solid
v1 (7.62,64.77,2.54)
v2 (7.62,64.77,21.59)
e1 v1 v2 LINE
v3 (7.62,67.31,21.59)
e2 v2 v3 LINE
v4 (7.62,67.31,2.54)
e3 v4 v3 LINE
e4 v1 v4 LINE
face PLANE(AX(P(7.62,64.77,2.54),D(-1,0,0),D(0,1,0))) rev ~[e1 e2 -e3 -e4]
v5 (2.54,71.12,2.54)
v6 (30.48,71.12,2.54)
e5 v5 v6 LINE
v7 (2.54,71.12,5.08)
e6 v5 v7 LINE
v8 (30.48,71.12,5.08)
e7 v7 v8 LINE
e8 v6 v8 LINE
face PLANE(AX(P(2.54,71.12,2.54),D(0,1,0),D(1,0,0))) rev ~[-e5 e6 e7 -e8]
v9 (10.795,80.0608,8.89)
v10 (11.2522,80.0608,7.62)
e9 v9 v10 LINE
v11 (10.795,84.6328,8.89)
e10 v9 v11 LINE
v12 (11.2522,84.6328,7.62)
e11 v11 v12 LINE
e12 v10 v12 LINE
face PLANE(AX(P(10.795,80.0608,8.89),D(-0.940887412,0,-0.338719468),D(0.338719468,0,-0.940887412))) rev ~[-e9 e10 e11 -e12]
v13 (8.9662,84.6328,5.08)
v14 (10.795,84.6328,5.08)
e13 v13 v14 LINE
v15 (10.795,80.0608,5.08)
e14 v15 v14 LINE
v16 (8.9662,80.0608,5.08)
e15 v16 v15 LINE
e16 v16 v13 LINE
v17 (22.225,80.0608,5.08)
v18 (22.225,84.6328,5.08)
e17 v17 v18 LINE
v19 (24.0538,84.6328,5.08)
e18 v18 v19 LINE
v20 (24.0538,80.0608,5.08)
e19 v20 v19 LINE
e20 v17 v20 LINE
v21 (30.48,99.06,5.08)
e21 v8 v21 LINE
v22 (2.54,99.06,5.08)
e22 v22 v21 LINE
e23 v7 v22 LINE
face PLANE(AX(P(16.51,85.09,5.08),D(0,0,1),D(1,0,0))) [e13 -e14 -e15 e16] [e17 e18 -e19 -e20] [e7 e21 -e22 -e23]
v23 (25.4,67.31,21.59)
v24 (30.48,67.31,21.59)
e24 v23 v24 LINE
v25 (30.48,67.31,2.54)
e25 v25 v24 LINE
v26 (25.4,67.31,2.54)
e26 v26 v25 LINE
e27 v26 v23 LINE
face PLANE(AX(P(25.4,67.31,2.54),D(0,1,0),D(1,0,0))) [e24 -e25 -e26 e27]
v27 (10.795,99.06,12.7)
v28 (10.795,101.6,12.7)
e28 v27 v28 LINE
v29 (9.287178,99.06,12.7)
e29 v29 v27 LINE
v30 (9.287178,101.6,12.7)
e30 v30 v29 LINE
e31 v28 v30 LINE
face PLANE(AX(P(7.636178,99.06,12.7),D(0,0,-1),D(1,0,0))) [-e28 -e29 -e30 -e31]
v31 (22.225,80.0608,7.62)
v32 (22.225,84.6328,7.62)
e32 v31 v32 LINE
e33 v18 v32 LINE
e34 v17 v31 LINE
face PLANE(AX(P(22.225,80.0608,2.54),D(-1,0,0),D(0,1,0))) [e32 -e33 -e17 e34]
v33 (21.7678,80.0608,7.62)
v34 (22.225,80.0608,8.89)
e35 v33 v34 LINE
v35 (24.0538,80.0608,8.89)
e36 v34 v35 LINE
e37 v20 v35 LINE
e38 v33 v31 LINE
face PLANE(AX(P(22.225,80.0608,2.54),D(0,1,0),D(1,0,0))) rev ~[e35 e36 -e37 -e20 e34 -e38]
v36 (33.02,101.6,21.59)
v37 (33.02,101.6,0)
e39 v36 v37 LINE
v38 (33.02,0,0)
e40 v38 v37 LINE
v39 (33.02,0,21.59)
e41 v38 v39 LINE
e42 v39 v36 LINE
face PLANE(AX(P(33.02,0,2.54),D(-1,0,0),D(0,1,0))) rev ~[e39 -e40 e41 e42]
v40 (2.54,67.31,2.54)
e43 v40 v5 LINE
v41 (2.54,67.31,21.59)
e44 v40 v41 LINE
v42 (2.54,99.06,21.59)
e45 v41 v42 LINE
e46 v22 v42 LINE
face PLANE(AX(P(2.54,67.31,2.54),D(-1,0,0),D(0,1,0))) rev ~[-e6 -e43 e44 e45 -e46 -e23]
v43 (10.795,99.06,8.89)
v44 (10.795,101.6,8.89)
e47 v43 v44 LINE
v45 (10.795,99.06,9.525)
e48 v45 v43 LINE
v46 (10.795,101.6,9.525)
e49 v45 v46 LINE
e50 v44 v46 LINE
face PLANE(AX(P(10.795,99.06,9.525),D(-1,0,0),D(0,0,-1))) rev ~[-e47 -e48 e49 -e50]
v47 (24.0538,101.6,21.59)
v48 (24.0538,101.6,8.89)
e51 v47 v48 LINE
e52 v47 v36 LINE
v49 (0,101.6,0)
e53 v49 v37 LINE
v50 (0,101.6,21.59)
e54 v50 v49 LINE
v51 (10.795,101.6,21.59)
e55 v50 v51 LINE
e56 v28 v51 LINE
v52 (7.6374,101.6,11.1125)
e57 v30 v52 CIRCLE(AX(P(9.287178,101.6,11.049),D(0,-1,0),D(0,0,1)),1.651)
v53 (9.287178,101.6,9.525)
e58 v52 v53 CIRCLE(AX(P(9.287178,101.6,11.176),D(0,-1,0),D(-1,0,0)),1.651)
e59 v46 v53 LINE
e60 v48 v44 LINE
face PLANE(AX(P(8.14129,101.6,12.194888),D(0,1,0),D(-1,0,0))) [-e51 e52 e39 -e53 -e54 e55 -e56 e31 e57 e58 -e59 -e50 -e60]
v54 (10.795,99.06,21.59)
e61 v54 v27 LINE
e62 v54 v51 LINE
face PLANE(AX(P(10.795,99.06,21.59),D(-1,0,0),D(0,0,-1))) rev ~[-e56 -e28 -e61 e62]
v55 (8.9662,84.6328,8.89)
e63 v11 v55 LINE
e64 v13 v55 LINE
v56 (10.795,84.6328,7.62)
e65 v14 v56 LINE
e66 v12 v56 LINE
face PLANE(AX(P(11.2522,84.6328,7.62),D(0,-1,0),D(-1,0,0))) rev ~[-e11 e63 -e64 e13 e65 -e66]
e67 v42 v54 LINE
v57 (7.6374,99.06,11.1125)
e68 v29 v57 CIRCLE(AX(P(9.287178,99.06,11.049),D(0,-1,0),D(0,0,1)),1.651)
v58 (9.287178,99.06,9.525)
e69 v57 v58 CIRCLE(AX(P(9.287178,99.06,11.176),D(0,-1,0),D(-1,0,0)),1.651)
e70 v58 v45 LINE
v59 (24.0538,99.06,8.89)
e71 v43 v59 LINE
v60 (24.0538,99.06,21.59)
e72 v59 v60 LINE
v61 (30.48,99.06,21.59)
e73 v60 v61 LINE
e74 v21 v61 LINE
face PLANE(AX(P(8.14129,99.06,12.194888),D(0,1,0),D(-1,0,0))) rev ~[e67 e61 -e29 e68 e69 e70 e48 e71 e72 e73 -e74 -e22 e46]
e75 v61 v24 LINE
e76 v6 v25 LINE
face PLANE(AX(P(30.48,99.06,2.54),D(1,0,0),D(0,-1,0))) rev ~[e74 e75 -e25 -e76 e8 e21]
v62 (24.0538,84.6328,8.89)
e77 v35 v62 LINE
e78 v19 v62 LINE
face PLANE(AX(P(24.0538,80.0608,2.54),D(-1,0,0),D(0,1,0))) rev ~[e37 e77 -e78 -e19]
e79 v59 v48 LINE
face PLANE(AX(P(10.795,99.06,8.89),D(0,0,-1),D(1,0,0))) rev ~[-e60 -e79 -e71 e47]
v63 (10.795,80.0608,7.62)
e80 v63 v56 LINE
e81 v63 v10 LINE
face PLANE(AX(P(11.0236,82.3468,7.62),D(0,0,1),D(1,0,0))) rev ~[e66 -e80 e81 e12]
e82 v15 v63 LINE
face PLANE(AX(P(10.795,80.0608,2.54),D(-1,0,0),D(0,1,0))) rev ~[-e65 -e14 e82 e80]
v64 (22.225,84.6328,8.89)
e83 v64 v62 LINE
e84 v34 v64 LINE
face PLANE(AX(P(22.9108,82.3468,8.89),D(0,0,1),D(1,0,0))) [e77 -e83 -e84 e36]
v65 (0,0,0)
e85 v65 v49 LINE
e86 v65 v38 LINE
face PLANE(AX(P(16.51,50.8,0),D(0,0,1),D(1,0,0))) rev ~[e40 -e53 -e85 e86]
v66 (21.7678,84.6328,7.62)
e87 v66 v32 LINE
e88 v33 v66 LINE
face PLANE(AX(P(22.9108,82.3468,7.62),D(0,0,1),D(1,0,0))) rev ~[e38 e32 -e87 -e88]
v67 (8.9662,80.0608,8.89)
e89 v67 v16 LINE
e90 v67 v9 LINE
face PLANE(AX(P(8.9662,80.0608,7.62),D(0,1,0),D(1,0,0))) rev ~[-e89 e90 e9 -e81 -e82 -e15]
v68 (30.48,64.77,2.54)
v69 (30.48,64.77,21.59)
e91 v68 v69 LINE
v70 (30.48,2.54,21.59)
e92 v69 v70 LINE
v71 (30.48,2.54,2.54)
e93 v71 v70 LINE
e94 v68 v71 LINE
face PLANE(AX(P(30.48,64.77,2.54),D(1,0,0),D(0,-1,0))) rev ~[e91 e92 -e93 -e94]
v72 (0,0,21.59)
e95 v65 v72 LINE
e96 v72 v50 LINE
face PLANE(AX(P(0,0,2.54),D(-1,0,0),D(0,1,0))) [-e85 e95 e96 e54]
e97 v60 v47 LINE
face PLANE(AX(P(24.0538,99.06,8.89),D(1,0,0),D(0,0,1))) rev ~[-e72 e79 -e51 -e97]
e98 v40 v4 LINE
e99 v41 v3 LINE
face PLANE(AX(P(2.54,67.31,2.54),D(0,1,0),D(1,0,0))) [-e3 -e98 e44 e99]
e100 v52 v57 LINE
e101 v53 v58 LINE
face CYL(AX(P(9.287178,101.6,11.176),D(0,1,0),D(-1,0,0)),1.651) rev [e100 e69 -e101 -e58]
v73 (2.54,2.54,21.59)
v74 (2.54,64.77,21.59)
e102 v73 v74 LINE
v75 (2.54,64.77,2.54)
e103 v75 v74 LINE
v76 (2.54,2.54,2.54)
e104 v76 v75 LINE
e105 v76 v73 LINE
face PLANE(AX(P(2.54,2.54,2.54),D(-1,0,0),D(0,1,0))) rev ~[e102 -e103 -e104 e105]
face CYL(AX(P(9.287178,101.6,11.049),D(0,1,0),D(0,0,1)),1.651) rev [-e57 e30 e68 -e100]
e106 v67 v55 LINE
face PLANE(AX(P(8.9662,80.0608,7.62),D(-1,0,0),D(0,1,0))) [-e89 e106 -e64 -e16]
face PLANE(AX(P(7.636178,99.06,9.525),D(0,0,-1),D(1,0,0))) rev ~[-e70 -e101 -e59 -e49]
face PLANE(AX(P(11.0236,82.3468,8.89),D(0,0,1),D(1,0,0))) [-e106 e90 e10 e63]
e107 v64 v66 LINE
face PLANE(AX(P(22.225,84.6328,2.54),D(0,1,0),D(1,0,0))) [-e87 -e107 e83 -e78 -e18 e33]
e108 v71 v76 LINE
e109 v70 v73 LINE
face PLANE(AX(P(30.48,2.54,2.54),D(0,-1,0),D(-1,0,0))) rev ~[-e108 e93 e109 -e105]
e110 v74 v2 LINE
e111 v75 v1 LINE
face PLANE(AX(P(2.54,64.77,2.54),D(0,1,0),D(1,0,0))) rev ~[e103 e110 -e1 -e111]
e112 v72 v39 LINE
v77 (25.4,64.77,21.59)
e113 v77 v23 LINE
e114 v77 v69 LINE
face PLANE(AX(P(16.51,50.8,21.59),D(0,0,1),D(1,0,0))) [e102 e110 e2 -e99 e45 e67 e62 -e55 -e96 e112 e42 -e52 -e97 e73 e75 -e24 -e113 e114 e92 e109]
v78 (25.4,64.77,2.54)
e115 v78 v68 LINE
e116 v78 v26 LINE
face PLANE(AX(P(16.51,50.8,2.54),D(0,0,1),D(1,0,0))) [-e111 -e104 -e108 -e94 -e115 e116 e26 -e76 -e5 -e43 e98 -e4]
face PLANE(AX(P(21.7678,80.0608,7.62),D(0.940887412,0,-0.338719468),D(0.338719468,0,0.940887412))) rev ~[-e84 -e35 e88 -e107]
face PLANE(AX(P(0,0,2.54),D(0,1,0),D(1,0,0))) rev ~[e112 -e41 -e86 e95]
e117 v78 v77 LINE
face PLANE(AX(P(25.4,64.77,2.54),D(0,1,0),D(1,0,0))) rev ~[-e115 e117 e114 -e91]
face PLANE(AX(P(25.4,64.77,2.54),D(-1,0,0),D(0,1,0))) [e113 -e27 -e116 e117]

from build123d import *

# Parameters (mm, degrees)
F0_W        = 33.02
F0_H        = 101.6
F1_DEPTH    = 2.54
F2_W        = 33.02
F2_H        = 101.6
F2_W_2      = 5.08
F2_H_2      = 2.54
F3_DEPTH    = 19.05
F2_W_3      = 27.94
F2_H_3      = 27.94
F2_W_4      = 1.8288
F2_H_4      = 4.572
F4_DEPTH    = 2.54
F5_DEPTH    = 5.08
F7_W        = 3.1588217151
F7_H        = 3.175
F8_DEPTH    = 25.4
F9_T1_DEPTH = 2.54
F10_W       = 0.4572
F10_H       = 4.572
F10_W_2     = 1.8288
F10_W_3     = 2.286
F11_DEPTH   = 1.27
F13_DEPTH   = 6.35


# Not quite as in the source:
# - a fillet or chamfer that OpenCascade refuses, or shapes differently, is made with other operations: its cross-section is extruded or revolved along the edge and cut away or added


with BuildPart() as f1:
    # F0 (on Top) → F1 (new body)
    with BuildSketch(Plane.XY):
        with Locations((16.51, 50.8)):
            Rectangle(F0_W, F0_H)
    extrude(amount=F1_DEPTH)

    # F2 (on face) → F3 (join)
    with BuildSketch(Plane.XY.offset(2.54)):
        with Locations((16.51, 50.8)):
            Rectangle(F2_W, F2_H)
        Polygon((30.48, 2.54), (2.54, 2.54), (2.54, 64.77), (2.54, 67.31), (2.54, 71.12), (2.54, 99.06), (30.48, 99.06), (30.48, 71.12), (30.48, 67.31), (30.48, 64.77), align=None, mode=Mode.SUBTRACT)
        with Locations((5.08, 66.04)):
            Rectangle(F2_W_2, F2_H_2)
        with Locations((27.94, 66.04)):
            Rectangle(F2_W_2, F2_H_2)
    extrude(amount=F3_DEPTH)

    # F2 (on face) → F4 (join)
    with BuildSketch(Plane.XY.offset(2.54)):
        with Locations((16.51, 85.09)):
            Rectangle(F2_W_3, F2_H_3)
        with Locations((9.8806, 82.3468)):
            Rectangle(F2_W_4, F2_H_4, mode=Mode.SUBTRACT)
        with Locations((23.1394, 82.3468)):
            Rectangle(F2_W_4, F2_H_4, mode=Mode.SUBTRACT)
    extrude(amount=F4_DEPTH)

    # F2 (on face) → F5 (join)
    with BuildSketch(Plane.XY.offset(2.54)):
        with Locations((9.8806, 82.3468)):
            Rectangle(F2_W_4, F2_H_4)
        with Locations((23.1394, 82.3468)):
            Rectangle(F2_W_4, F2_H_4)
    extrude(amount=F5_DEPTH)

    # F7 (on face) → F8 (cut)
    with BuildSketch(Plane.XZ.offset(-99.06)):
        Polygon((10.795, 9.525), (10.795, 8.89), (24.0538, 8.89), (24.0538, 21.59), (10.795, 21.59), (10.795, 12.7), align=None)
        with Locations((9.2155891424, 11.1125)):
            Rectangle(F7_W, F7_H)
    extrude(amount=-F8_DEPTH, mode=Mode.SUBTRACT)

    # F9: fillet of radius 1.651 on 2 edges, made by hand

    # F9_s2 → F9_t1 (join)
    with BuildSketch(Plane.XZ.offset(-101.6)):
        with BuildLine():
            ThreePointArc((9.2871782849, 12.7), (8.1197449891, 12.2164332957), (7.6361782849, 11.049))
            Line((7.6361782849, 11.049), (7.6361782849, 12.7))
            Line((7.6361782849, 12.7), (9.2871782849, 12.7))
        make_face()
        with BuildLine():
            ThreePointArc((7.6361782849, 11.176), (8.1197449891, 10.0085667043), (9.2871782849, 9.525))
            Line((9.2871782849, 9.525), (7.6361782849, 9.525))
            Line((7.6361782849, 9.525), (7.6361782849, 11.176))
        make_face()
    extrude(amount=F9_T1_DEPTH)

    # F10 (on face) → F11 (join)
    with BuildSketch(Plane.XY.offset(7.62)):
        with Locations((11.0236, 82.3468)):
            Rectangle(F10_W, F10_H)
        with Locations((9.8806, 82.3468)):
            Rectangle(F10_W_2, F10_H)
        with Locations((22.9108, 82.3468)):
            Rectangle(F10_W_3, F10_H)
    extrude(amount=F11_DEPTH)

    # F12 (on face) → F13 (cut)
    with BuildSketch(Plane.XZ.offset(-80.0608)):
        Polygon((10.795, 8.89), (11.2522, 7.62), (11.2522, 8.89), align=None)
        Polygon((21.7678, 7.62), (22.225, 8.89), (21.7678, 8.89), align=None)
    extrude(amount=-F13_DEPTH, mode=Mode.SUBTRACT)


solid = f1.part
